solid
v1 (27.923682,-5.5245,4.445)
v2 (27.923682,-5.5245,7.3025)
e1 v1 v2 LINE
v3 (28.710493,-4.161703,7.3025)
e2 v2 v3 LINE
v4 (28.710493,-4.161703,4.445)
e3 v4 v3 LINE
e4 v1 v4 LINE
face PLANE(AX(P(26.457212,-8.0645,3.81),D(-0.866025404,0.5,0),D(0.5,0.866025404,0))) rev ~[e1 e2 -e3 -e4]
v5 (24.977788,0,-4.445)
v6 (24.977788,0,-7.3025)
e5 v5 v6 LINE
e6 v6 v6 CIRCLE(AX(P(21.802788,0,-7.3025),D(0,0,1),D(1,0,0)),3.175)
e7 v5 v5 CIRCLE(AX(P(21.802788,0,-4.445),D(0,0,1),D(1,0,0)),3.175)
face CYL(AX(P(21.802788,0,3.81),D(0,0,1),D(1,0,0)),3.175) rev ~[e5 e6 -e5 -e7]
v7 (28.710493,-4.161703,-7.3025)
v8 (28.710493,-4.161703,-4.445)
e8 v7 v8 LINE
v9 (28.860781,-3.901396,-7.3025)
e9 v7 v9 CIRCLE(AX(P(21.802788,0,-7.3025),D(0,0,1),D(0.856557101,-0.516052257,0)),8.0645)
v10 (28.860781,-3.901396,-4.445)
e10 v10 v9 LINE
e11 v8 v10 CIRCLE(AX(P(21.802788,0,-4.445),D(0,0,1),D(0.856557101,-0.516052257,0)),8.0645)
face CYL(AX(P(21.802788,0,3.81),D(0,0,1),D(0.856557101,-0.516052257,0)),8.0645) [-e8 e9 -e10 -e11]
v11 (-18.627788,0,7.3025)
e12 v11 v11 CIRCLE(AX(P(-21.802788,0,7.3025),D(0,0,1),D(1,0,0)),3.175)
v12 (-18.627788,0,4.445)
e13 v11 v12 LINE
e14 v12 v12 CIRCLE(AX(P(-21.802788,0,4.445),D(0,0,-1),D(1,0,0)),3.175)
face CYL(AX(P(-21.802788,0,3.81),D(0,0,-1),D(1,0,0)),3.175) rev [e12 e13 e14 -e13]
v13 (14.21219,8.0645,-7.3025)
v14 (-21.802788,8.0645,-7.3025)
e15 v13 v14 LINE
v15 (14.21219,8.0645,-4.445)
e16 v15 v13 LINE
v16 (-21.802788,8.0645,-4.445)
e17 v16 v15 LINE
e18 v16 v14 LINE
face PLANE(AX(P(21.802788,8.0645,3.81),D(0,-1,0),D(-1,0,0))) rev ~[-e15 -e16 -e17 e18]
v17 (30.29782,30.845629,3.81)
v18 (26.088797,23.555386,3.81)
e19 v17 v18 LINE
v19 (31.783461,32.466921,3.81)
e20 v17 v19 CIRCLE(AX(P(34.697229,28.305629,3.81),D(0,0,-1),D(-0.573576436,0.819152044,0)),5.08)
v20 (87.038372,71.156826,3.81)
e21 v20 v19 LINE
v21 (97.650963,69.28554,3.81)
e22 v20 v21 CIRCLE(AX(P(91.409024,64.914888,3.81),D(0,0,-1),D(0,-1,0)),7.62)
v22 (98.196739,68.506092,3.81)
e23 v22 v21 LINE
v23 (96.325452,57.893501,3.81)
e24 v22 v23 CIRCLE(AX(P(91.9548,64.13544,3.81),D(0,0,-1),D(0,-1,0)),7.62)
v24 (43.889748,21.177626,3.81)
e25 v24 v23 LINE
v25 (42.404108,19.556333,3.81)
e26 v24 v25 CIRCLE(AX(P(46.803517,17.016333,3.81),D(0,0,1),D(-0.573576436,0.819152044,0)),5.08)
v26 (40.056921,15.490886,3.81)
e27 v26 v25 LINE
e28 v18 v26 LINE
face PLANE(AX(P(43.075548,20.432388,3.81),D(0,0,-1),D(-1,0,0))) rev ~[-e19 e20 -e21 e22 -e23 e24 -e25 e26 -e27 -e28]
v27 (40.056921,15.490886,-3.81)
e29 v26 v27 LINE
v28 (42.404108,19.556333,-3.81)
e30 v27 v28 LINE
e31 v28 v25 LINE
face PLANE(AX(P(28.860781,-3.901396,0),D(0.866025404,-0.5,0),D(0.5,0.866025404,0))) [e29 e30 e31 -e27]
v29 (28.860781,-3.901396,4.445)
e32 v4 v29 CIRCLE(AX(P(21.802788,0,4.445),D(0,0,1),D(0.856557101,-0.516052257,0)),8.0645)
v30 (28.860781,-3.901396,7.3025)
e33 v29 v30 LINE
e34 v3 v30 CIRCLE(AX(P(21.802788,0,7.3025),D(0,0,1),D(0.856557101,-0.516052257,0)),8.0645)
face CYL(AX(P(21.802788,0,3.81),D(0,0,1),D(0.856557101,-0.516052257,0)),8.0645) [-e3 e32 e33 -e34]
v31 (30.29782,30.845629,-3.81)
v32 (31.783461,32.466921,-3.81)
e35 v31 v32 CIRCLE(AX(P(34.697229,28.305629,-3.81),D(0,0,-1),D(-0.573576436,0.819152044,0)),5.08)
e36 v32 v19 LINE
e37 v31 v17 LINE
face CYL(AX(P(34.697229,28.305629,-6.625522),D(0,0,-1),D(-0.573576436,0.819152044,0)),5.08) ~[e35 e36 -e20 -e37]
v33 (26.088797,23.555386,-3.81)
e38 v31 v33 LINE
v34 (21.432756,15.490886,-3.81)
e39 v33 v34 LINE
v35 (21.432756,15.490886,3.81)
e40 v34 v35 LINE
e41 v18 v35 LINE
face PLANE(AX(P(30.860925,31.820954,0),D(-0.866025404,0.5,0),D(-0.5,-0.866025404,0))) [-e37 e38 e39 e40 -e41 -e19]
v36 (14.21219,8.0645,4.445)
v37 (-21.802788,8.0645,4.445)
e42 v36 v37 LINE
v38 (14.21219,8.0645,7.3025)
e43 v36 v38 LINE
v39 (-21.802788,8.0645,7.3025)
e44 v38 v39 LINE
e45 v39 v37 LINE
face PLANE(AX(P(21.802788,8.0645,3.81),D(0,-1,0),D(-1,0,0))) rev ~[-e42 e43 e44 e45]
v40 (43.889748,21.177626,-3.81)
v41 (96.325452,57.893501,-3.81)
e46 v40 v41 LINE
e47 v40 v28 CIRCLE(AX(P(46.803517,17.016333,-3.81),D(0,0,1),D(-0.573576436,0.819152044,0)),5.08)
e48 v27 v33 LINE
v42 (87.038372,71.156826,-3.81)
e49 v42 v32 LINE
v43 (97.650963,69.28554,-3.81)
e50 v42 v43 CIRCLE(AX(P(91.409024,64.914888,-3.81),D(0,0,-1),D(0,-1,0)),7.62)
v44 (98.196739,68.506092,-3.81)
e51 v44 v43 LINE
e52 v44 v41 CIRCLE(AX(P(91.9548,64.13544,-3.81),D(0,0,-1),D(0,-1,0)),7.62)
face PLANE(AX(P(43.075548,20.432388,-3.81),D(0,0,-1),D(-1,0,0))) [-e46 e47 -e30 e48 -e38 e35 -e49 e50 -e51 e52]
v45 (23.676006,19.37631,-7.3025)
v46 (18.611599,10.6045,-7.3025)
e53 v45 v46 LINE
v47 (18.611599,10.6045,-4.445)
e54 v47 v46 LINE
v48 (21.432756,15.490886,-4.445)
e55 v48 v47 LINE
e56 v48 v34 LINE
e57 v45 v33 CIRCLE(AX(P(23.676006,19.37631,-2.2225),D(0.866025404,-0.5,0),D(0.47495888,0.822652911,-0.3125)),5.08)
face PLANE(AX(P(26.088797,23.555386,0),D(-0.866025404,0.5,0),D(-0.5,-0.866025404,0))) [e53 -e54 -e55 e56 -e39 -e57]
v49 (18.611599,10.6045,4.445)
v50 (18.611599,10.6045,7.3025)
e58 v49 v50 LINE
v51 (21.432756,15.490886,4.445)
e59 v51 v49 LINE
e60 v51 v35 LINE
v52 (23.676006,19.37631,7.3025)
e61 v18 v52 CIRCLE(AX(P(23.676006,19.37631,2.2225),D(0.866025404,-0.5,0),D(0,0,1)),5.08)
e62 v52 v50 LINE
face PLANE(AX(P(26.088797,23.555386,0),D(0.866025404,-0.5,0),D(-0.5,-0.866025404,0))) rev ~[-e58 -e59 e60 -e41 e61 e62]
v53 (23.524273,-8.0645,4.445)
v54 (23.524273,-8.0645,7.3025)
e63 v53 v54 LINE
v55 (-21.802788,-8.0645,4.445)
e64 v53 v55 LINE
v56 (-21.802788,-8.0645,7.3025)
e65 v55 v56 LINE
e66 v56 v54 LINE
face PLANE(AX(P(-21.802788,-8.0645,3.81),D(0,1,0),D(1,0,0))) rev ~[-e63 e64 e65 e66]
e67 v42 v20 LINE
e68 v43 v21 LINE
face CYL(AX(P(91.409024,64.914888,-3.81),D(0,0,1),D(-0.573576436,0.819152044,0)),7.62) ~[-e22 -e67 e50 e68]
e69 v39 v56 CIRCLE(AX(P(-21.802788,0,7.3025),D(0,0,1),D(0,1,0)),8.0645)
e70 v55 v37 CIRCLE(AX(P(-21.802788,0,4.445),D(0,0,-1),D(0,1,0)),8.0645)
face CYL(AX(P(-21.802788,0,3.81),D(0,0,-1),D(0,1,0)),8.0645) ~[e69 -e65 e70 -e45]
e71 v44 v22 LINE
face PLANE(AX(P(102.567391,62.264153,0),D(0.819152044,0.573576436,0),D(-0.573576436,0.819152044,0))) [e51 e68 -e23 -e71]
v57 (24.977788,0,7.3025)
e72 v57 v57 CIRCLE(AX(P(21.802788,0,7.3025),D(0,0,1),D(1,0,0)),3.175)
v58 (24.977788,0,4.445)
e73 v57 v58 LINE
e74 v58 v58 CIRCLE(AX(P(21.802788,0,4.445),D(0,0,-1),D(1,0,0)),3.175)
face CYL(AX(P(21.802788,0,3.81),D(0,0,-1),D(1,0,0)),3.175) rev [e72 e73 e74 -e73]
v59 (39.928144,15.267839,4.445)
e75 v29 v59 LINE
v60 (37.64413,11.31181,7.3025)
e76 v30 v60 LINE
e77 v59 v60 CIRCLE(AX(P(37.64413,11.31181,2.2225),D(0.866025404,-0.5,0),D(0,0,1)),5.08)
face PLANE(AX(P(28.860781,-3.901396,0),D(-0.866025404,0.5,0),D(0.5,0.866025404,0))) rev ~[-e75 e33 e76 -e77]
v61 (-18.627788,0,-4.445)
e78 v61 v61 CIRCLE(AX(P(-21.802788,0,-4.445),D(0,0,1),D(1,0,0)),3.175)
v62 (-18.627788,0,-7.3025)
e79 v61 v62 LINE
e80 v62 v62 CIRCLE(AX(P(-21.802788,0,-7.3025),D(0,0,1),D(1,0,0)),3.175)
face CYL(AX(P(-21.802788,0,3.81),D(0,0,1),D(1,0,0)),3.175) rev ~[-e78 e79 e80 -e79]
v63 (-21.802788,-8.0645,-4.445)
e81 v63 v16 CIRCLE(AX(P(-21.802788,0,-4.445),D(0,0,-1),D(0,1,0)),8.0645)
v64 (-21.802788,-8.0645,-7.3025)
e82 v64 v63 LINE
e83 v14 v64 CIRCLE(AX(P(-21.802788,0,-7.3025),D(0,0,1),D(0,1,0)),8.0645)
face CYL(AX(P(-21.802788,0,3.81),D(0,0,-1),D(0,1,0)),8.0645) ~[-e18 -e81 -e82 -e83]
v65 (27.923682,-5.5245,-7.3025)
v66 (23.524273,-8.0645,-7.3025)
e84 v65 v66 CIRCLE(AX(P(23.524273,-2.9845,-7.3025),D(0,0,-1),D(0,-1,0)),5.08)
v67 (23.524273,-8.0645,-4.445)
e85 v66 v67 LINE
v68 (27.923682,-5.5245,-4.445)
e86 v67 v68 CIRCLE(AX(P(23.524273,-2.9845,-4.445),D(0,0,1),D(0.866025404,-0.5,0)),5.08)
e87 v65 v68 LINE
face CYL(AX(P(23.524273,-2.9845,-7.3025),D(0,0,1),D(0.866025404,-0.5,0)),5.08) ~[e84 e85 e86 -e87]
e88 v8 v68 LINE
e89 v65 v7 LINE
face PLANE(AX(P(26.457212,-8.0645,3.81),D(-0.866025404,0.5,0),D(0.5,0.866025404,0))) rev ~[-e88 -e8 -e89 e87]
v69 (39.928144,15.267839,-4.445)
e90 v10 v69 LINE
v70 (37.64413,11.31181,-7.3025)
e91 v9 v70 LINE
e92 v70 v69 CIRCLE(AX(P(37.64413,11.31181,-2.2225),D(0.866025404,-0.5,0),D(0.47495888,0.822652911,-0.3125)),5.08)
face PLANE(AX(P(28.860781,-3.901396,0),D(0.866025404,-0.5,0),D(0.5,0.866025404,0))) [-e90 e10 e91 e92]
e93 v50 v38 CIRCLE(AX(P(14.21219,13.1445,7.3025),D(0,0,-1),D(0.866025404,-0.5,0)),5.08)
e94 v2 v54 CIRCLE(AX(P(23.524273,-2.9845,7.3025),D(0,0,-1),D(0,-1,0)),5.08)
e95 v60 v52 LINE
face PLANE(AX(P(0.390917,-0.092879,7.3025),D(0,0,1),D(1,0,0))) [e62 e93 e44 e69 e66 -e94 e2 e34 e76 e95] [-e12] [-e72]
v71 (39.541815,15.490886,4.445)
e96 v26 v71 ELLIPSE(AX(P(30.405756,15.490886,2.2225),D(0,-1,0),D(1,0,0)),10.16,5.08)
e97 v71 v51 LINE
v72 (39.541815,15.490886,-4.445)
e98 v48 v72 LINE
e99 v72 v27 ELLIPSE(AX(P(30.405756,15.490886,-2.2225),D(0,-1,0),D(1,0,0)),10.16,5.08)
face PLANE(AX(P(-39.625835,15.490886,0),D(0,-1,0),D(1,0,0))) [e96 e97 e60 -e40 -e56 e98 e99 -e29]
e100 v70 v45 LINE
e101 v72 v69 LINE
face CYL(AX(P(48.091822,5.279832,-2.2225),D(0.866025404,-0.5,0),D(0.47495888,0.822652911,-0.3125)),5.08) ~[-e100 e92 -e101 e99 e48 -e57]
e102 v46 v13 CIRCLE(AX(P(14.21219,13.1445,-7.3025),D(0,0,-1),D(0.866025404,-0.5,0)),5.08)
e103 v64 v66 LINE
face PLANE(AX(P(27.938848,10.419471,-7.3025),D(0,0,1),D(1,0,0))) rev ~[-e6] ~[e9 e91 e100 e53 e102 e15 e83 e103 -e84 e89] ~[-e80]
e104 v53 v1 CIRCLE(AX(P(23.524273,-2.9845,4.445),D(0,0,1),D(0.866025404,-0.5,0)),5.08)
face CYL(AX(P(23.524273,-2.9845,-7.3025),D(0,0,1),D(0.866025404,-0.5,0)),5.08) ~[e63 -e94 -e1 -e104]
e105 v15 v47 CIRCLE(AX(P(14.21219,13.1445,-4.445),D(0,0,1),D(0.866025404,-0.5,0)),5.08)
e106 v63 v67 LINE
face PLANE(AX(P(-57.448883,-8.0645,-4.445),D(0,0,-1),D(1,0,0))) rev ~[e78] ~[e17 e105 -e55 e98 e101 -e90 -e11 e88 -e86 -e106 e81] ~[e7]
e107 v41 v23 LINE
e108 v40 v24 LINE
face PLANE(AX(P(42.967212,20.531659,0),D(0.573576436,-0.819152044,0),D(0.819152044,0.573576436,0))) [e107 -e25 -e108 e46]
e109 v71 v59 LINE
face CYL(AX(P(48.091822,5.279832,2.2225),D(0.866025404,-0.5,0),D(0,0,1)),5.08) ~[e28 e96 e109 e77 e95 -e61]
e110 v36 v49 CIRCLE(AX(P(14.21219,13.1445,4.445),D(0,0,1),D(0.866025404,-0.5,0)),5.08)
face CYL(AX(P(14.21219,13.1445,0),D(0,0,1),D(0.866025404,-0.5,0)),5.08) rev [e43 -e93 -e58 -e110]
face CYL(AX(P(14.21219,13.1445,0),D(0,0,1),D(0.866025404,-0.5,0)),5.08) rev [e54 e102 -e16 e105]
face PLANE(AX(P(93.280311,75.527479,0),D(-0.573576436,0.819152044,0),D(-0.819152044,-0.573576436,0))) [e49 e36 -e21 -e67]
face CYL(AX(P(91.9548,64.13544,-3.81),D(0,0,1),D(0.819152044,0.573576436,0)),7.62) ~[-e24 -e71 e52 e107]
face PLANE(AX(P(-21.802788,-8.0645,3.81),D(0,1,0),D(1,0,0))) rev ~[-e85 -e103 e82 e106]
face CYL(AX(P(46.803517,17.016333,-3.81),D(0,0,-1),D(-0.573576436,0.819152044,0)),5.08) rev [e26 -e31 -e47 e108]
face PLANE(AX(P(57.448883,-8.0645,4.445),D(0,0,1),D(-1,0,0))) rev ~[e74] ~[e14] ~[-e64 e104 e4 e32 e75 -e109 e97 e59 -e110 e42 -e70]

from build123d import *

# Parameters (mm, degrees)
F0_R          = 3.175
F1_DEPTH      = 3.81
F1_DEPTH_BACK = 3.81
F2_R          = 3.175
F3_DEPTH      = 3.4925
F3_DEPTH_BACK = 11.1125
F5_R          = 5.08
F6_R          = 7.62
F8_DEPTH      = 7.3025
F8_DEPTH_BACK = 7.3025
F4_W          = 35.6460946558
F4_H          = 8.89
F4_W_2        = 48.26
F4_W_3        = 30.9916705634
F9_DEPTH      = 23.5553863263
F10_T1_DEPTH  = 7.62
F10_T3_DEPTH  = 40.2569110938
F10_T5_DEPTH  = 13.2510444311
F10_T7_DEPTH  = 40.2569110938


# Not quite as in the source:
# - a fillet or chamfer that OpenCascade refuses, or shapes differently, is made with other operations: its cross-section is extruded or revolved along the edge and cut away or added


with BuildPart() as f1:
    # F0 (on Top) → F1 (new body, two sides)
    with BuildSketch(Plane.XY) as f1_sk:
        with BuildLine():
            Line((17.1451295545, 8.0645), (21.8027879538, 8.0645))
            ThreePointArc((21.8027879538, 8.0645), (28.7489728397, 4.0971545957), (28.860781215, -3.9013960801))
            Line((28.860781215, -3.9013960801), (42.9672120462, 20.531658833))
            Line((42.9672120462, 20.531658833), (102.5673909916, 62.2641534092))
            Line((102.5673909916, 62.2641534092), (93.2803106107, 75.5274787436))
            Line((93.2803106107, 75.5274787436), (30.8609248359, 31.8209542937))
            Line((30.8609248359, 31.8209542937), (17.1451295545, 8.0645))
        make_face()
        with BuildLine():
            ThreePointArc((28.7104927, -4.1617034239), (28.7868498226, -4.03225), (28.860781215, -3.9013960801))
            Line((28.860781215, -3.9013960801), (28.7104927, -4.1617034239))
        make_face()
        with BuildLine():
            ThreePointArc((28.860781215, -3.9013960801), (28.7489728397, 4.0971545957), (21.8027879538, 8.0645))
            Line((21.8027879538, 8.0645), (17.1451295545, 8.0645))
            Line((17.1451295545, 8.0645), (-21.8027879538, 8.0645))
            ThreePointArc((-21.8027879538, 8.0645), (-29.8672879538, 0), (-21.8027879538, -8.0645))
            Line((-21.8027879538, -8.0645), (21.8027879538, -8.0645))
            Line((21.8027879538, -8.0645), (26.4572120462, -8.0645))
            Line((26.4572120462, -8.0645), (28.7104927, -4.1617034239))
            Line((28.7104927, -4.1617034239), (28.860781215, -3.9013960801))
        make_face()
        with Locations((-21.8027879538, 0)):
            Circle(F0_R, mode=Mode.SUBTRACT)
        with Locations((21.8027879538, 0)):
            Circle(F0_R, mode=Mode.SUBTRACT)
    extrude(amount=F1_DEPTH)
    extrude(f1_sk.sketch, amount=-F1_DEPTH_BACK)

    # F2 (on face) → F3 (join, two sides)
    with BuildSketch(Plane.XY.offset(3.81)) as f3_sk:
        with BuildLine():
            Line((17.1451295545, 8.0645), (-21.8027879538, 8.0645))
            ThreePointArc((-21.8027879538, 8.0645), (-29.8672879538, 0), (-21.8027879538, -8.0645))
            Line((-21.8027879538, -8.0645), (26.4572120462, -8.0645))
            Line((26.4572120462, -8.0645), (28.7104927, -4.1617034239))
            ThreePointArc((28.7104927, -4.1617034239), (28.7868498226, -4.03225), (28.860781215, -3.9013960801))
            ThreePointArc((28.860781215, -3.9013960801), (28.7489728397, 4.0971545957), (21.8027879538, 8.0645))
            Line((21.8027879538, 8.0645), (17.1451295545, 8.0645))
        make_face()
        with Locations((-21.8027879538, 0)):
            Circle(F2_R, mode=Mode.SUBTRACT)
        with Locations((21.8027879538, 0)):
            Circle(F2_R, mode=Mode.SUBTRACT)
    extrude(amount=F3_DEPTH)
    extrude(f3_sk.sketch, amount=-F3_DEPTH_BACK)

    # F5
    f5_edges = [f1.edges().sort_by_distance(p)[0] for p in [
        (26.457212, -8.0645, 0),
        (17.14513, 8.0645, 0),
    ]]
    fillet(f5_edges, radius=F5_R)

    # F6
    f6_edges = [f1.edges().sort_by_distance(p)[0] for p in [
        (93.280311, 75.527479, 0),
        (102.567391, 62.264153, 0),
    ]]
    fillet(f6_edges, radius=F6_R)

    # F7 (on Top) → F8 (join, two sides)
    with BuildSketch(Plane.XY) as f8_sk:
        with BuildLine():
            Line((26.088796945, 23.5553863263), (18.6115992382, 10.6045))
            ThreePointArc((18.6115992382, 10.6045), (16.752190187, 8.7450909488), (14.212190187, 8.0645))
            Line((14.212190187, 8.0645), (21.8027879538, 8.0645))
            ThreePointArc((21.8027879538, 8.0645), (28.7489728397, 4.0971545957), (28.860781215, -3.9013960801))
            Line((28.860781215, -3.9013960801), (40.0569206826, 15.4908863263))
            Line((40.0569206826, 15.4908863263), (26.088796945, 23.5553863263))
        make_face()
    extrude(amount=F8_DEPTH)
    extrude(f8_sk.sketch, amount=-F8_DEPTH_BACK)

    # F4 (on face) → F9 (cut, through all)
    with BuildSketch(Plane.XZ.offset(8.0645)):
        with Locations((-39.6258352817, 0)):
            Rectangle(F4_W, F4_H)
        with Locations((2.3272120462, 0)):
            Rectangle(F4_W_2, F4_H)
        with Locations((41.9530473279, 0)):
            Rectangle(F4_W_3, F4_H)
    extrude(amount=-F9_DEPTH, mode=Mode.SUBTRACT)

    # F10: fillet of radius 5.08 on 4 edges, made by hand

    # F10_s2 → F10_t1 (join)
    with BuildSketch(Plane.XY.offset(-3.81)):
        with BuildLine():
            ThreePointArc((43.8897483577, 21.1776257125), (43.0581477833, 20.4483315822), (42.4041076031, 19.5563333275))
            Line((42.4041076031, 19.5563333275), (42.9672120462, 20.531658833))
            Line((42.9672120462, 20.531658833), (43.8897483577, 21.1776257125))
        make_face()
    extrude(amount=F10_T1_DEPTH)

    # F10_s4 → F10_t3 (cut)
    with BuildSketch(Plane(origin=(33.7826319428, -19.5044116461, 0), x_dir=(0, 0, 1), z_dir=(-0.8660254038, 0.5, 0))):
        with BuildLine():
            ThreePointArc((-3.81, 33.4439614271), (-6.3377703435, 31.5967932158), (-7.3025, 28.6183792083))
            Line((-7.3025, 28.6183792083), (-7.3025, 33.4439614271))
            Line((-7.3025, 33.4439614271), (-3.81, 33.4439614271))
        make_face()
    extrude(amount=F10_T3_DEPTH, mode=Mode.SUBTRACT)

    # F10_s6 → F10_t5 (cut)
    with BuildSketch(Plane.XY.offset(-6.6255222156)):
        with BuildLine():
            ThreePointArc((31.7834611474, 32.4669211732), (30.951860573, 31.7376270429), (30.2978203928, 30.8456287882))
            Line((30.2978203928, 30.8456287882), (30.8609248359, 31.8209542937))
            Line((30.8609248359, 31.8209542937), (31.7834611474, 32.4669211732))
        make_face()
    extrude(amount=F10_T5_DEPTH, mode=Mode.SUBTRACT)

    # F10_s8 → F10_t7 (cut)
    with BuildSketch(Plane(origin=(33.7826319428, -19.5044116461, 0), x_dir=(0, 0, 1), z_dir=(-0.8660254038, 0.5, 0))):
        with BuildLine():
            ThreePointArc((7.3025, 28.6183792083), (6.3377703435, 31.5967932158), (3.81, 33.4439614271))
            Line((3.81, 33.4439614271), (7.3025, 33.4439614271))
            Line((7.3025, 33.4439614271), (7.3025, 28.6183792083))
        make_face()
    extrude(amount=F10_T7_DEPTH, mode=Mode.SUBTRACT)


solid = f1.part
